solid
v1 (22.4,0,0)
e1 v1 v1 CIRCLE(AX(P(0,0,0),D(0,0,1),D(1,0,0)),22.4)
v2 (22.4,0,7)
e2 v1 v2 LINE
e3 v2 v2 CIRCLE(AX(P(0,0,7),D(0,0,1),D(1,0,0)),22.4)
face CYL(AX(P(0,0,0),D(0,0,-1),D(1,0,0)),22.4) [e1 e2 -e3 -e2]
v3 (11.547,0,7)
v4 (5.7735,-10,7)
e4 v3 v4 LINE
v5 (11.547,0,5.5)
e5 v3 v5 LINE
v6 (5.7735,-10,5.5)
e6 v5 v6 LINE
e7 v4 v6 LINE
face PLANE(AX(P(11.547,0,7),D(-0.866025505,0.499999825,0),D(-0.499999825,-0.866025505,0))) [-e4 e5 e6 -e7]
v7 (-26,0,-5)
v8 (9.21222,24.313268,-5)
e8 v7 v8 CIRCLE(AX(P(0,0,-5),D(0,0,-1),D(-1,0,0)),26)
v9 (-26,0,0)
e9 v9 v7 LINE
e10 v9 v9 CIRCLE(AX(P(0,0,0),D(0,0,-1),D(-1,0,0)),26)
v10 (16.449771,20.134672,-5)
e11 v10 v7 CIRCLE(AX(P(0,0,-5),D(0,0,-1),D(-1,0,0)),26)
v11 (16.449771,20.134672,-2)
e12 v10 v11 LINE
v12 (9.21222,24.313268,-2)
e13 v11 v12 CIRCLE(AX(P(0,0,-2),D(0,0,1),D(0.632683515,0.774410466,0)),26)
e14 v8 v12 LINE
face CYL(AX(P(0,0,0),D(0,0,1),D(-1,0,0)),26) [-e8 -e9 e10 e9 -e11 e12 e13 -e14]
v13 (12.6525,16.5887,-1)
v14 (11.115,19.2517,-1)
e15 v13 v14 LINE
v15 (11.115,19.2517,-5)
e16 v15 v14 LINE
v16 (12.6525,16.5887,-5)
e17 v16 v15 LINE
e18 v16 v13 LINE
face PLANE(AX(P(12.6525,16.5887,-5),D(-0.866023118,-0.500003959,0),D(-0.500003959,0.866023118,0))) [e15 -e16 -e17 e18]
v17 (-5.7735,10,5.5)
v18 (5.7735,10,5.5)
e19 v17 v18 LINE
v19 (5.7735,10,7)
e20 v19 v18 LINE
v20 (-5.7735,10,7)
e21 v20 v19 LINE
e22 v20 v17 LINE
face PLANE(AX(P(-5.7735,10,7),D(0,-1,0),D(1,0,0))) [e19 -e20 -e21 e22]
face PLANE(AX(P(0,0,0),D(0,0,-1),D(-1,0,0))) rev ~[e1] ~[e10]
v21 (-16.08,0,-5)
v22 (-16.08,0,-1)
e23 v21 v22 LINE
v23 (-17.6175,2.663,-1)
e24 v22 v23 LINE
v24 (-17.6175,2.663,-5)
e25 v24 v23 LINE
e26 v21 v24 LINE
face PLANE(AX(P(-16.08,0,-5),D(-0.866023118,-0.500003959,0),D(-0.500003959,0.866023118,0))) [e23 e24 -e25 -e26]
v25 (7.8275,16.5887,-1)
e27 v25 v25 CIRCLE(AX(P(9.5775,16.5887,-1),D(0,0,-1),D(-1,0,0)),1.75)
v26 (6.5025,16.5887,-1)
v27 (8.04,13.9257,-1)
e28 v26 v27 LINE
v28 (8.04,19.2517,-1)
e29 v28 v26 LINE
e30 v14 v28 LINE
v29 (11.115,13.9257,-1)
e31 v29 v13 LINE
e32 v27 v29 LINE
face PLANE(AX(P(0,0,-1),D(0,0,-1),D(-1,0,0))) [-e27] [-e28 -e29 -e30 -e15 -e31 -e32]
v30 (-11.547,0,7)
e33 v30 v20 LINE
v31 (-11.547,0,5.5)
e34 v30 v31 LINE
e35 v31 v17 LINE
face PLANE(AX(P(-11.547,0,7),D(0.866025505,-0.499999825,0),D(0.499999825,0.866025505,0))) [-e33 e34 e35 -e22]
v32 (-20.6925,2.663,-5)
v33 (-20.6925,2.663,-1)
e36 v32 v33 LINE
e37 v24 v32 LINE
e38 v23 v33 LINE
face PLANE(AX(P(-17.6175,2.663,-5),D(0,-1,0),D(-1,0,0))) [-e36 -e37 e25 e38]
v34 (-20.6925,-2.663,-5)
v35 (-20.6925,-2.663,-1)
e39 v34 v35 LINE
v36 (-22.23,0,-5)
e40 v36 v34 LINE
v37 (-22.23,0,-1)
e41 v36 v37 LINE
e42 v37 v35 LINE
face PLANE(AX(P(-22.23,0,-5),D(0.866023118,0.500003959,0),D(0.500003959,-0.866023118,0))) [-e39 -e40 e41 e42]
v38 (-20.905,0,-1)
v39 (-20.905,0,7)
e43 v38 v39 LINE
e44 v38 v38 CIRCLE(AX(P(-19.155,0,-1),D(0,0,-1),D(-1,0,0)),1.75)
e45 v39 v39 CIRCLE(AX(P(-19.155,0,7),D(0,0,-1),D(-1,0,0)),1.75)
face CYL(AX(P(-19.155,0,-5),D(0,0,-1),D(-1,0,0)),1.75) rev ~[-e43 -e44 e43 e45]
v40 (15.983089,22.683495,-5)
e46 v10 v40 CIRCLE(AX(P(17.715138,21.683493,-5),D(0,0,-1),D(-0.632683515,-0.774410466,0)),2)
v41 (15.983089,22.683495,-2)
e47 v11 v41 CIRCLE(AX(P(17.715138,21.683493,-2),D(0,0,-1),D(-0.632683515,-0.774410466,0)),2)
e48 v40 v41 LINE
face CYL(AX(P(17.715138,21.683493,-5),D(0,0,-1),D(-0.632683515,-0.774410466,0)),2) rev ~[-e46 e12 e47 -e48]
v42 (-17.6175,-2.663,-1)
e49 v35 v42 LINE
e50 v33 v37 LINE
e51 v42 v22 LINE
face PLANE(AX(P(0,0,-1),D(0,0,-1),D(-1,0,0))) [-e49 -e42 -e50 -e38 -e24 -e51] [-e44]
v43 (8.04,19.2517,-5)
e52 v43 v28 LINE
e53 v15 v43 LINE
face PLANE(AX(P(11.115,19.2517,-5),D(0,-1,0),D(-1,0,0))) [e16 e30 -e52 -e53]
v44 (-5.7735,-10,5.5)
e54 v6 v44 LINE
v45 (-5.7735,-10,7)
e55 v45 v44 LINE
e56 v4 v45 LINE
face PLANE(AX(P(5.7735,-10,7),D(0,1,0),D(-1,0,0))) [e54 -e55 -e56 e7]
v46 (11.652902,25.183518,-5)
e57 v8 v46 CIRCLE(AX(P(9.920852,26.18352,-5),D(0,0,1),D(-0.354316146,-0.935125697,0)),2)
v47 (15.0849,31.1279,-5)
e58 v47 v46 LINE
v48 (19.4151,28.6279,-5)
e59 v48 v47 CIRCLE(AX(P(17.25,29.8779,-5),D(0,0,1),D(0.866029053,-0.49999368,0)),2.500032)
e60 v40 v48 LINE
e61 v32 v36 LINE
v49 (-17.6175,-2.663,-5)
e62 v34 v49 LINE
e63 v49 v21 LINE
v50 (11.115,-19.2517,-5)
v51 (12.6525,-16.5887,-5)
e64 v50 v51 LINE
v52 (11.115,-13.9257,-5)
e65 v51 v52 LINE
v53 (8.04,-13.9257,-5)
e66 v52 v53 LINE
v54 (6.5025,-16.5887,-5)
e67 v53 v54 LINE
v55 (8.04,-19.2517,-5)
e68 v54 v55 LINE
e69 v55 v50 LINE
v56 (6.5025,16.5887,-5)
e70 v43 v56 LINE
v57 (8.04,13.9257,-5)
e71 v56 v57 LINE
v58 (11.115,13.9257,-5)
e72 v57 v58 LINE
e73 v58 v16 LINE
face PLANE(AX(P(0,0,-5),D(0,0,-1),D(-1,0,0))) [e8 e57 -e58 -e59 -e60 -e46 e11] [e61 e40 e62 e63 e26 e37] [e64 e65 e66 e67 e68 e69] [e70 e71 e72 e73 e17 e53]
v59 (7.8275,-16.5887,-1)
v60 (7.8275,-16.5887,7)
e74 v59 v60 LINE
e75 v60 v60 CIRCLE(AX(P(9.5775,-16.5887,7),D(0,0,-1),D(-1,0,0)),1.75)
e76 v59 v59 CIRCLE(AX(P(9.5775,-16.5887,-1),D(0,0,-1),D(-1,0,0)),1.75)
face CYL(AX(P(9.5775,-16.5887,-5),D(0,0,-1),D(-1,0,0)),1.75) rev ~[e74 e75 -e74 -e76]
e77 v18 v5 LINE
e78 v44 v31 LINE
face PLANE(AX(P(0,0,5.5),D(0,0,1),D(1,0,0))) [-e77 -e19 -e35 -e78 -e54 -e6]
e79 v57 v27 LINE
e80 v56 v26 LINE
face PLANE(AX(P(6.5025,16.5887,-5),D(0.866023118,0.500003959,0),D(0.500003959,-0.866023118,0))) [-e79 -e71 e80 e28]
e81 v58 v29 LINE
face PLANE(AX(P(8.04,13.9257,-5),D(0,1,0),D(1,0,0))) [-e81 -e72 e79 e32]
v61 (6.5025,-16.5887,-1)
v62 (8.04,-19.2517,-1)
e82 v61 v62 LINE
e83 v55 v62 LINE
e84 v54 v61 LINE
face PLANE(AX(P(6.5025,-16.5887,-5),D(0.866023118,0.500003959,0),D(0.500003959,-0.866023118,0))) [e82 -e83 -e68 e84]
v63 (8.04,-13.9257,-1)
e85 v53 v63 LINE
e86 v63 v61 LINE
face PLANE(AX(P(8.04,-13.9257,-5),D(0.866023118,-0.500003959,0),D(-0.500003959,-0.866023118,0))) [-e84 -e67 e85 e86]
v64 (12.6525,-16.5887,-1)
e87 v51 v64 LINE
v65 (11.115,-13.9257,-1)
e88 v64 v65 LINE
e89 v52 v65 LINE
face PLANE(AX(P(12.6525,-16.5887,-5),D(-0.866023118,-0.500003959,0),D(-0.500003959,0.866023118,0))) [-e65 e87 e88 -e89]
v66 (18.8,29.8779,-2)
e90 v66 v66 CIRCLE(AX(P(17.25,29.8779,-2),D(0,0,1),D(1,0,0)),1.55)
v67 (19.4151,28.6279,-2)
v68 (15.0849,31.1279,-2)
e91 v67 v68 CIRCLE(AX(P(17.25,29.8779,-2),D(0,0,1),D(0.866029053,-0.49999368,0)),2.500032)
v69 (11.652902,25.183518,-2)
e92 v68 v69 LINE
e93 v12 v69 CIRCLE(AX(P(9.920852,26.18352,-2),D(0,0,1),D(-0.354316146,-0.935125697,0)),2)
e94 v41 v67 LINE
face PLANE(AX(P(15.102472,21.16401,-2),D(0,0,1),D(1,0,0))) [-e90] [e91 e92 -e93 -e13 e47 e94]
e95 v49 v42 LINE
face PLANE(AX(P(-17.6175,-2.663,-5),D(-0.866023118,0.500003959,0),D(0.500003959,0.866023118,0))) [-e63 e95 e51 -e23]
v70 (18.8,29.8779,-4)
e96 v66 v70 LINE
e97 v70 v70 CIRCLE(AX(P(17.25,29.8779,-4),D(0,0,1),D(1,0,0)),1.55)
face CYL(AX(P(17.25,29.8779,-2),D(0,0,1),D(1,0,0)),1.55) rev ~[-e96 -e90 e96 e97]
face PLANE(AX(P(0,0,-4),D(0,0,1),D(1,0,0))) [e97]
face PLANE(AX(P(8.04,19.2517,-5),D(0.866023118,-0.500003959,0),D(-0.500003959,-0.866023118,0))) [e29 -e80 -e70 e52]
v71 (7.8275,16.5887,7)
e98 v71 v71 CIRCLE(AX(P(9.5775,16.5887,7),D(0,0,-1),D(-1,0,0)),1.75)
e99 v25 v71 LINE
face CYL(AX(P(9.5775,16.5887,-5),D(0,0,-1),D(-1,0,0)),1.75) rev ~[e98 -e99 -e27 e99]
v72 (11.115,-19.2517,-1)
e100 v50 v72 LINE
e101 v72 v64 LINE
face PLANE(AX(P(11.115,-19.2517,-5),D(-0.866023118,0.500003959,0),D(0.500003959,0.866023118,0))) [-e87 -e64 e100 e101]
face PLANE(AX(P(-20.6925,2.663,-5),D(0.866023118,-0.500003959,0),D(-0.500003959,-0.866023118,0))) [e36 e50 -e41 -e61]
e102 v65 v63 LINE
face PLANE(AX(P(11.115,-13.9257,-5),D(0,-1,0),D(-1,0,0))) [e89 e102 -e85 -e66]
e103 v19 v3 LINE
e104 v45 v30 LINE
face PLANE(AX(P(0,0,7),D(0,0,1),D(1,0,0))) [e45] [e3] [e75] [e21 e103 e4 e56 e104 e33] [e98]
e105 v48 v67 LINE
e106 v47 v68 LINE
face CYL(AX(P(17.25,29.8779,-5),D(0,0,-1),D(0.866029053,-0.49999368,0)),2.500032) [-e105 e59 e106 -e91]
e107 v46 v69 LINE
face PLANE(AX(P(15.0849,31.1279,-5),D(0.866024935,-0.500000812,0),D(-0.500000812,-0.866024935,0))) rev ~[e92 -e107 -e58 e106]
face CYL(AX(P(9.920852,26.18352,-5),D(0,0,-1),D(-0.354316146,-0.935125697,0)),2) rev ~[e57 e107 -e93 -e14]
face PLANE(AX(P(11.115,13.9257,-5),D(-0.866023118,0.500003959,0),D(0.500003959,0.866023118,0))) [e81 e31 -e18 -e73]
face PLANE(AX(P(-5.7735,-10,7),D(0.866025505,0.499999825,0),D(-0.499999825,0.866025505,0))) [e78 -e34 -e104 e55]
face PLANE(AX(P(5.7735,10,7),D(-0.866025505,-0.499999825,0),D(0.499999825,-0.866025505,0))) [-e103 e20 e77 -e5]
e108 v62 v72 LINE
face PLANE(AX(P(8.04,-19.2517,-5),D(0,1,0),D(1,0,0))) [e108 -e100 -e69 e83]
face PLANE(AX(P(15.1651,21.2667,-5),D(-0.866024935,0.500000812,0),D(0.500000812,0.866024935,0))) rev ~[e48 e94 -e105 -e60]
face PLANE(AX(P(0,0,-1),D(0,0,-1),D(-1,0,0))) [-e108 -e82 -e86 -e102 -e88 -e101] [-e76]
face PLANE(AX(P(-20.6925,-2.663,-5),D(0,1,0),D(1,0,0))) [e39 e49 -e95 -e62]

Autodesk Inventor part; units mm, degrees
ref_plane "YZ Plane" through (0, 0, 0) normal (1, 0, 0) x (0, 1, 0)
ref_plane "XZ Plane" through (0, 0, 0) normal (0, 1, 0) x (-1, 0, 0)
sketch "Sketch1" plane through (0, 0, 0) normal (0, 0, 1) x (1, 0, 0)
  circle A0 centre (0, 0) radius 22.4
  dimension "d0" = 44.8
extrude "Extrusion1" add sketch "Sketch1" along normal blind 7
sketch "Sketch2" plane through (0, 0, 0) normal (0, 0, -1) x (-1, 0, 0)
  circle A0 centre (0, 0) radius 26
  dimension "d3" = 52
extrude "Extrusion2" add sketch "Sketch2" along normal blind 5
sketch "Sketch3" plane through (0, 0, -5) normal (0, 0, -1) x (-1, 0, 0)
  line L0 (22.23, 0) -> (20.6925, -2.663)
  line L1 (20.6925, -2.663) -> (17.6175, -2.663)
  line L2 (17.6175, -2.663) -> (16.08, 0)
  line L3 (16.08, 0) -> (17.6175, 2.663)
  line L4 (17.6175, 2.663) -> (20.6925, 2.663)
  line L5 (20.6925, 2.663) -> (22.23, 0)
  line L6 (-11.115, 19.2517) -> (-8.04, 19.2517)
  line L7 (-8.04, 19.2517) -> (-6.5025, 16.5887)
  line L8 (-6.5025, 16.5887) -> (-8.04, 13.9257)
  line L9 (-8.04, 13.9257) -> (-11.115, 13.9257)
  line L10 (-11.115, 13.9257) -> (-12.6525, 16.5887)
  line L11 (-12.6525, 16.5887) -> (-11.115, 19.2517)
  line L12 (-11.115, -19.2517) -> (-12.6525, -16.5887)
  line L13 (-12.6525, -16.5887) -> (-11.115, -13.9257)
  line L14 (-11.115, -13.9257) -> (-8.04, -13.9257)
  line L15 (-8.04, -13.9257) -> (-6.5025, -16.5887)
  line L16 (-6.5025, -16.5887) -> (-8.04, -19.2517)
  line L17 (-8.04, -19.2517) -> (-11.115, -19.2517)
  point P0 (0, 0)
  point P1 (19.155, 0)
  point P2 (-9.5775, 16.5887)
  point P3 (-9.5775, -16.5887)
  dimension "d6" = 3.075
  dimension "d7" = 19.155
  dimension "d10" = 360
extrude "Extrusion3" cut sketch "Sketch3" against normal blind 4
sketch "Sketch4" plane through (0, 0, -5) normal (0, 0, -1) x (-1, 0, 0)
  circle A0 centre (19.155, 0) radius 1.75
  circle A1 centre (-9.5775, 16.5887) radius 1.75
  circle A2 centre (-9.5775, -16.5887) radius 1.75
  point P0 (0, 0)
  dimension "d14" = 3.5
  dimension "d15" = 19.155
  dimension "d18" = 360
extrude "Extrusion4" cut sketch "Sketch4" against normal through all
sketch "Sketch5" plane through (0, 0, 7) normal (0, 0, 1) x (1, 0, 0)
  line L0 (-11.547, 0) -> (-5.7735, 10)
  line L1 (-5.7735, 10) -> (5.7735, 10)
  line L2 (5.7735, 10) -> (11.547, 0)
  line L3 (11.547, 0) -> (5.7735, -10)
  line L4 (5.7735, -10) -> (-5.7735, -10)
  line L5 (-5.7735, -10) -> (-11.547, 0)
  point P0 (0, 0)
  point P1 (0, 0)
  dimension "d22" = 10
extrude "Extrusion5" cut sketch "Sketch5" against normal blind 1.5
ref_plane "Work Plane1" through (0, 0, 6.5) normal (0, 0, 1) x (1, 0, 0)
sketch "Sketch6" plane through (0, 0, 6.5) normal (0, 0, 1) x (1, 0, 0)
  circle A0 centre (0, 0) radius 22.5
  circle A1 centre (0, 0) radius 22.4 projected
  circle A2 centre (0, 0) radius 21.1
  dimension "d26" = 45
  dimension "d27" = 42.2
extrude "Extrusion6" [suppressed]
sketch "Sketch7" plane through (0, 0, -5) normal (0, 0, -1) x (-1, 0, 0)
  point P0 (0, 0)
sketch "Sketch8" plane through (0, 0, -5) normal (0, 0, 1) x (1, 0, 0)
  line L0 (0, 0) -> (17.25, 29.8779)
  line L1 (0, 0) -> (34.5, 0) construction
  circle A0 centre (0, 0) radius 26 projected
  line L2 (13, 22.5167) -> (17.25, 29.8779) construction
  line L3 (15.1651, 21.2667) -> (19.4151, 28.6279)
  line L4 (15.0849, 31.1279) -> (10.8349, 23.7667)
  arc A1 (10.8349, 23.7667) -> (15.1651, 21.2667) centre (13, 22.5167) ccw
  arc A2 (19.4151, 28.6279) -> (15.0849, 31.1279) centre (17.25, 29.8779) ccw
  point P0 (15.125, 26.1973)
  point P1 (10.7773, 23.6611)
  point P2 (15.1025, 21.164)
  dimension "d30" = 34.5
  dimension "d31" = 60
  dimension "d32" = 5
extrude "Extrusion7" add sketch "Sketch8" along normal blind 3 contours A0 A1 L4 A2 L3
sketch "Sketch9" plane through (0, 0, -2) normal (0, 0, 1) x (1, 0, 0)
  arc A0 (19.4151, 28.6279) -> (15.0849, 31.1279) centre (17.25, 29.8779) ccw projected
  circle A1 centre (17.25, 29.8779) radius 1.55
  point P0 (0, 0)
  dimension "d35" = 3.1
extrude "Extrusion8" cut sketch "Sketch9" against normal blind 2
fillet "Fillet1" radius 2 2 edges at (15.1025, 21.164, -3.5) (10.7773, 23.6611, -3.5)
properties part number "Planet Carrier 3"
